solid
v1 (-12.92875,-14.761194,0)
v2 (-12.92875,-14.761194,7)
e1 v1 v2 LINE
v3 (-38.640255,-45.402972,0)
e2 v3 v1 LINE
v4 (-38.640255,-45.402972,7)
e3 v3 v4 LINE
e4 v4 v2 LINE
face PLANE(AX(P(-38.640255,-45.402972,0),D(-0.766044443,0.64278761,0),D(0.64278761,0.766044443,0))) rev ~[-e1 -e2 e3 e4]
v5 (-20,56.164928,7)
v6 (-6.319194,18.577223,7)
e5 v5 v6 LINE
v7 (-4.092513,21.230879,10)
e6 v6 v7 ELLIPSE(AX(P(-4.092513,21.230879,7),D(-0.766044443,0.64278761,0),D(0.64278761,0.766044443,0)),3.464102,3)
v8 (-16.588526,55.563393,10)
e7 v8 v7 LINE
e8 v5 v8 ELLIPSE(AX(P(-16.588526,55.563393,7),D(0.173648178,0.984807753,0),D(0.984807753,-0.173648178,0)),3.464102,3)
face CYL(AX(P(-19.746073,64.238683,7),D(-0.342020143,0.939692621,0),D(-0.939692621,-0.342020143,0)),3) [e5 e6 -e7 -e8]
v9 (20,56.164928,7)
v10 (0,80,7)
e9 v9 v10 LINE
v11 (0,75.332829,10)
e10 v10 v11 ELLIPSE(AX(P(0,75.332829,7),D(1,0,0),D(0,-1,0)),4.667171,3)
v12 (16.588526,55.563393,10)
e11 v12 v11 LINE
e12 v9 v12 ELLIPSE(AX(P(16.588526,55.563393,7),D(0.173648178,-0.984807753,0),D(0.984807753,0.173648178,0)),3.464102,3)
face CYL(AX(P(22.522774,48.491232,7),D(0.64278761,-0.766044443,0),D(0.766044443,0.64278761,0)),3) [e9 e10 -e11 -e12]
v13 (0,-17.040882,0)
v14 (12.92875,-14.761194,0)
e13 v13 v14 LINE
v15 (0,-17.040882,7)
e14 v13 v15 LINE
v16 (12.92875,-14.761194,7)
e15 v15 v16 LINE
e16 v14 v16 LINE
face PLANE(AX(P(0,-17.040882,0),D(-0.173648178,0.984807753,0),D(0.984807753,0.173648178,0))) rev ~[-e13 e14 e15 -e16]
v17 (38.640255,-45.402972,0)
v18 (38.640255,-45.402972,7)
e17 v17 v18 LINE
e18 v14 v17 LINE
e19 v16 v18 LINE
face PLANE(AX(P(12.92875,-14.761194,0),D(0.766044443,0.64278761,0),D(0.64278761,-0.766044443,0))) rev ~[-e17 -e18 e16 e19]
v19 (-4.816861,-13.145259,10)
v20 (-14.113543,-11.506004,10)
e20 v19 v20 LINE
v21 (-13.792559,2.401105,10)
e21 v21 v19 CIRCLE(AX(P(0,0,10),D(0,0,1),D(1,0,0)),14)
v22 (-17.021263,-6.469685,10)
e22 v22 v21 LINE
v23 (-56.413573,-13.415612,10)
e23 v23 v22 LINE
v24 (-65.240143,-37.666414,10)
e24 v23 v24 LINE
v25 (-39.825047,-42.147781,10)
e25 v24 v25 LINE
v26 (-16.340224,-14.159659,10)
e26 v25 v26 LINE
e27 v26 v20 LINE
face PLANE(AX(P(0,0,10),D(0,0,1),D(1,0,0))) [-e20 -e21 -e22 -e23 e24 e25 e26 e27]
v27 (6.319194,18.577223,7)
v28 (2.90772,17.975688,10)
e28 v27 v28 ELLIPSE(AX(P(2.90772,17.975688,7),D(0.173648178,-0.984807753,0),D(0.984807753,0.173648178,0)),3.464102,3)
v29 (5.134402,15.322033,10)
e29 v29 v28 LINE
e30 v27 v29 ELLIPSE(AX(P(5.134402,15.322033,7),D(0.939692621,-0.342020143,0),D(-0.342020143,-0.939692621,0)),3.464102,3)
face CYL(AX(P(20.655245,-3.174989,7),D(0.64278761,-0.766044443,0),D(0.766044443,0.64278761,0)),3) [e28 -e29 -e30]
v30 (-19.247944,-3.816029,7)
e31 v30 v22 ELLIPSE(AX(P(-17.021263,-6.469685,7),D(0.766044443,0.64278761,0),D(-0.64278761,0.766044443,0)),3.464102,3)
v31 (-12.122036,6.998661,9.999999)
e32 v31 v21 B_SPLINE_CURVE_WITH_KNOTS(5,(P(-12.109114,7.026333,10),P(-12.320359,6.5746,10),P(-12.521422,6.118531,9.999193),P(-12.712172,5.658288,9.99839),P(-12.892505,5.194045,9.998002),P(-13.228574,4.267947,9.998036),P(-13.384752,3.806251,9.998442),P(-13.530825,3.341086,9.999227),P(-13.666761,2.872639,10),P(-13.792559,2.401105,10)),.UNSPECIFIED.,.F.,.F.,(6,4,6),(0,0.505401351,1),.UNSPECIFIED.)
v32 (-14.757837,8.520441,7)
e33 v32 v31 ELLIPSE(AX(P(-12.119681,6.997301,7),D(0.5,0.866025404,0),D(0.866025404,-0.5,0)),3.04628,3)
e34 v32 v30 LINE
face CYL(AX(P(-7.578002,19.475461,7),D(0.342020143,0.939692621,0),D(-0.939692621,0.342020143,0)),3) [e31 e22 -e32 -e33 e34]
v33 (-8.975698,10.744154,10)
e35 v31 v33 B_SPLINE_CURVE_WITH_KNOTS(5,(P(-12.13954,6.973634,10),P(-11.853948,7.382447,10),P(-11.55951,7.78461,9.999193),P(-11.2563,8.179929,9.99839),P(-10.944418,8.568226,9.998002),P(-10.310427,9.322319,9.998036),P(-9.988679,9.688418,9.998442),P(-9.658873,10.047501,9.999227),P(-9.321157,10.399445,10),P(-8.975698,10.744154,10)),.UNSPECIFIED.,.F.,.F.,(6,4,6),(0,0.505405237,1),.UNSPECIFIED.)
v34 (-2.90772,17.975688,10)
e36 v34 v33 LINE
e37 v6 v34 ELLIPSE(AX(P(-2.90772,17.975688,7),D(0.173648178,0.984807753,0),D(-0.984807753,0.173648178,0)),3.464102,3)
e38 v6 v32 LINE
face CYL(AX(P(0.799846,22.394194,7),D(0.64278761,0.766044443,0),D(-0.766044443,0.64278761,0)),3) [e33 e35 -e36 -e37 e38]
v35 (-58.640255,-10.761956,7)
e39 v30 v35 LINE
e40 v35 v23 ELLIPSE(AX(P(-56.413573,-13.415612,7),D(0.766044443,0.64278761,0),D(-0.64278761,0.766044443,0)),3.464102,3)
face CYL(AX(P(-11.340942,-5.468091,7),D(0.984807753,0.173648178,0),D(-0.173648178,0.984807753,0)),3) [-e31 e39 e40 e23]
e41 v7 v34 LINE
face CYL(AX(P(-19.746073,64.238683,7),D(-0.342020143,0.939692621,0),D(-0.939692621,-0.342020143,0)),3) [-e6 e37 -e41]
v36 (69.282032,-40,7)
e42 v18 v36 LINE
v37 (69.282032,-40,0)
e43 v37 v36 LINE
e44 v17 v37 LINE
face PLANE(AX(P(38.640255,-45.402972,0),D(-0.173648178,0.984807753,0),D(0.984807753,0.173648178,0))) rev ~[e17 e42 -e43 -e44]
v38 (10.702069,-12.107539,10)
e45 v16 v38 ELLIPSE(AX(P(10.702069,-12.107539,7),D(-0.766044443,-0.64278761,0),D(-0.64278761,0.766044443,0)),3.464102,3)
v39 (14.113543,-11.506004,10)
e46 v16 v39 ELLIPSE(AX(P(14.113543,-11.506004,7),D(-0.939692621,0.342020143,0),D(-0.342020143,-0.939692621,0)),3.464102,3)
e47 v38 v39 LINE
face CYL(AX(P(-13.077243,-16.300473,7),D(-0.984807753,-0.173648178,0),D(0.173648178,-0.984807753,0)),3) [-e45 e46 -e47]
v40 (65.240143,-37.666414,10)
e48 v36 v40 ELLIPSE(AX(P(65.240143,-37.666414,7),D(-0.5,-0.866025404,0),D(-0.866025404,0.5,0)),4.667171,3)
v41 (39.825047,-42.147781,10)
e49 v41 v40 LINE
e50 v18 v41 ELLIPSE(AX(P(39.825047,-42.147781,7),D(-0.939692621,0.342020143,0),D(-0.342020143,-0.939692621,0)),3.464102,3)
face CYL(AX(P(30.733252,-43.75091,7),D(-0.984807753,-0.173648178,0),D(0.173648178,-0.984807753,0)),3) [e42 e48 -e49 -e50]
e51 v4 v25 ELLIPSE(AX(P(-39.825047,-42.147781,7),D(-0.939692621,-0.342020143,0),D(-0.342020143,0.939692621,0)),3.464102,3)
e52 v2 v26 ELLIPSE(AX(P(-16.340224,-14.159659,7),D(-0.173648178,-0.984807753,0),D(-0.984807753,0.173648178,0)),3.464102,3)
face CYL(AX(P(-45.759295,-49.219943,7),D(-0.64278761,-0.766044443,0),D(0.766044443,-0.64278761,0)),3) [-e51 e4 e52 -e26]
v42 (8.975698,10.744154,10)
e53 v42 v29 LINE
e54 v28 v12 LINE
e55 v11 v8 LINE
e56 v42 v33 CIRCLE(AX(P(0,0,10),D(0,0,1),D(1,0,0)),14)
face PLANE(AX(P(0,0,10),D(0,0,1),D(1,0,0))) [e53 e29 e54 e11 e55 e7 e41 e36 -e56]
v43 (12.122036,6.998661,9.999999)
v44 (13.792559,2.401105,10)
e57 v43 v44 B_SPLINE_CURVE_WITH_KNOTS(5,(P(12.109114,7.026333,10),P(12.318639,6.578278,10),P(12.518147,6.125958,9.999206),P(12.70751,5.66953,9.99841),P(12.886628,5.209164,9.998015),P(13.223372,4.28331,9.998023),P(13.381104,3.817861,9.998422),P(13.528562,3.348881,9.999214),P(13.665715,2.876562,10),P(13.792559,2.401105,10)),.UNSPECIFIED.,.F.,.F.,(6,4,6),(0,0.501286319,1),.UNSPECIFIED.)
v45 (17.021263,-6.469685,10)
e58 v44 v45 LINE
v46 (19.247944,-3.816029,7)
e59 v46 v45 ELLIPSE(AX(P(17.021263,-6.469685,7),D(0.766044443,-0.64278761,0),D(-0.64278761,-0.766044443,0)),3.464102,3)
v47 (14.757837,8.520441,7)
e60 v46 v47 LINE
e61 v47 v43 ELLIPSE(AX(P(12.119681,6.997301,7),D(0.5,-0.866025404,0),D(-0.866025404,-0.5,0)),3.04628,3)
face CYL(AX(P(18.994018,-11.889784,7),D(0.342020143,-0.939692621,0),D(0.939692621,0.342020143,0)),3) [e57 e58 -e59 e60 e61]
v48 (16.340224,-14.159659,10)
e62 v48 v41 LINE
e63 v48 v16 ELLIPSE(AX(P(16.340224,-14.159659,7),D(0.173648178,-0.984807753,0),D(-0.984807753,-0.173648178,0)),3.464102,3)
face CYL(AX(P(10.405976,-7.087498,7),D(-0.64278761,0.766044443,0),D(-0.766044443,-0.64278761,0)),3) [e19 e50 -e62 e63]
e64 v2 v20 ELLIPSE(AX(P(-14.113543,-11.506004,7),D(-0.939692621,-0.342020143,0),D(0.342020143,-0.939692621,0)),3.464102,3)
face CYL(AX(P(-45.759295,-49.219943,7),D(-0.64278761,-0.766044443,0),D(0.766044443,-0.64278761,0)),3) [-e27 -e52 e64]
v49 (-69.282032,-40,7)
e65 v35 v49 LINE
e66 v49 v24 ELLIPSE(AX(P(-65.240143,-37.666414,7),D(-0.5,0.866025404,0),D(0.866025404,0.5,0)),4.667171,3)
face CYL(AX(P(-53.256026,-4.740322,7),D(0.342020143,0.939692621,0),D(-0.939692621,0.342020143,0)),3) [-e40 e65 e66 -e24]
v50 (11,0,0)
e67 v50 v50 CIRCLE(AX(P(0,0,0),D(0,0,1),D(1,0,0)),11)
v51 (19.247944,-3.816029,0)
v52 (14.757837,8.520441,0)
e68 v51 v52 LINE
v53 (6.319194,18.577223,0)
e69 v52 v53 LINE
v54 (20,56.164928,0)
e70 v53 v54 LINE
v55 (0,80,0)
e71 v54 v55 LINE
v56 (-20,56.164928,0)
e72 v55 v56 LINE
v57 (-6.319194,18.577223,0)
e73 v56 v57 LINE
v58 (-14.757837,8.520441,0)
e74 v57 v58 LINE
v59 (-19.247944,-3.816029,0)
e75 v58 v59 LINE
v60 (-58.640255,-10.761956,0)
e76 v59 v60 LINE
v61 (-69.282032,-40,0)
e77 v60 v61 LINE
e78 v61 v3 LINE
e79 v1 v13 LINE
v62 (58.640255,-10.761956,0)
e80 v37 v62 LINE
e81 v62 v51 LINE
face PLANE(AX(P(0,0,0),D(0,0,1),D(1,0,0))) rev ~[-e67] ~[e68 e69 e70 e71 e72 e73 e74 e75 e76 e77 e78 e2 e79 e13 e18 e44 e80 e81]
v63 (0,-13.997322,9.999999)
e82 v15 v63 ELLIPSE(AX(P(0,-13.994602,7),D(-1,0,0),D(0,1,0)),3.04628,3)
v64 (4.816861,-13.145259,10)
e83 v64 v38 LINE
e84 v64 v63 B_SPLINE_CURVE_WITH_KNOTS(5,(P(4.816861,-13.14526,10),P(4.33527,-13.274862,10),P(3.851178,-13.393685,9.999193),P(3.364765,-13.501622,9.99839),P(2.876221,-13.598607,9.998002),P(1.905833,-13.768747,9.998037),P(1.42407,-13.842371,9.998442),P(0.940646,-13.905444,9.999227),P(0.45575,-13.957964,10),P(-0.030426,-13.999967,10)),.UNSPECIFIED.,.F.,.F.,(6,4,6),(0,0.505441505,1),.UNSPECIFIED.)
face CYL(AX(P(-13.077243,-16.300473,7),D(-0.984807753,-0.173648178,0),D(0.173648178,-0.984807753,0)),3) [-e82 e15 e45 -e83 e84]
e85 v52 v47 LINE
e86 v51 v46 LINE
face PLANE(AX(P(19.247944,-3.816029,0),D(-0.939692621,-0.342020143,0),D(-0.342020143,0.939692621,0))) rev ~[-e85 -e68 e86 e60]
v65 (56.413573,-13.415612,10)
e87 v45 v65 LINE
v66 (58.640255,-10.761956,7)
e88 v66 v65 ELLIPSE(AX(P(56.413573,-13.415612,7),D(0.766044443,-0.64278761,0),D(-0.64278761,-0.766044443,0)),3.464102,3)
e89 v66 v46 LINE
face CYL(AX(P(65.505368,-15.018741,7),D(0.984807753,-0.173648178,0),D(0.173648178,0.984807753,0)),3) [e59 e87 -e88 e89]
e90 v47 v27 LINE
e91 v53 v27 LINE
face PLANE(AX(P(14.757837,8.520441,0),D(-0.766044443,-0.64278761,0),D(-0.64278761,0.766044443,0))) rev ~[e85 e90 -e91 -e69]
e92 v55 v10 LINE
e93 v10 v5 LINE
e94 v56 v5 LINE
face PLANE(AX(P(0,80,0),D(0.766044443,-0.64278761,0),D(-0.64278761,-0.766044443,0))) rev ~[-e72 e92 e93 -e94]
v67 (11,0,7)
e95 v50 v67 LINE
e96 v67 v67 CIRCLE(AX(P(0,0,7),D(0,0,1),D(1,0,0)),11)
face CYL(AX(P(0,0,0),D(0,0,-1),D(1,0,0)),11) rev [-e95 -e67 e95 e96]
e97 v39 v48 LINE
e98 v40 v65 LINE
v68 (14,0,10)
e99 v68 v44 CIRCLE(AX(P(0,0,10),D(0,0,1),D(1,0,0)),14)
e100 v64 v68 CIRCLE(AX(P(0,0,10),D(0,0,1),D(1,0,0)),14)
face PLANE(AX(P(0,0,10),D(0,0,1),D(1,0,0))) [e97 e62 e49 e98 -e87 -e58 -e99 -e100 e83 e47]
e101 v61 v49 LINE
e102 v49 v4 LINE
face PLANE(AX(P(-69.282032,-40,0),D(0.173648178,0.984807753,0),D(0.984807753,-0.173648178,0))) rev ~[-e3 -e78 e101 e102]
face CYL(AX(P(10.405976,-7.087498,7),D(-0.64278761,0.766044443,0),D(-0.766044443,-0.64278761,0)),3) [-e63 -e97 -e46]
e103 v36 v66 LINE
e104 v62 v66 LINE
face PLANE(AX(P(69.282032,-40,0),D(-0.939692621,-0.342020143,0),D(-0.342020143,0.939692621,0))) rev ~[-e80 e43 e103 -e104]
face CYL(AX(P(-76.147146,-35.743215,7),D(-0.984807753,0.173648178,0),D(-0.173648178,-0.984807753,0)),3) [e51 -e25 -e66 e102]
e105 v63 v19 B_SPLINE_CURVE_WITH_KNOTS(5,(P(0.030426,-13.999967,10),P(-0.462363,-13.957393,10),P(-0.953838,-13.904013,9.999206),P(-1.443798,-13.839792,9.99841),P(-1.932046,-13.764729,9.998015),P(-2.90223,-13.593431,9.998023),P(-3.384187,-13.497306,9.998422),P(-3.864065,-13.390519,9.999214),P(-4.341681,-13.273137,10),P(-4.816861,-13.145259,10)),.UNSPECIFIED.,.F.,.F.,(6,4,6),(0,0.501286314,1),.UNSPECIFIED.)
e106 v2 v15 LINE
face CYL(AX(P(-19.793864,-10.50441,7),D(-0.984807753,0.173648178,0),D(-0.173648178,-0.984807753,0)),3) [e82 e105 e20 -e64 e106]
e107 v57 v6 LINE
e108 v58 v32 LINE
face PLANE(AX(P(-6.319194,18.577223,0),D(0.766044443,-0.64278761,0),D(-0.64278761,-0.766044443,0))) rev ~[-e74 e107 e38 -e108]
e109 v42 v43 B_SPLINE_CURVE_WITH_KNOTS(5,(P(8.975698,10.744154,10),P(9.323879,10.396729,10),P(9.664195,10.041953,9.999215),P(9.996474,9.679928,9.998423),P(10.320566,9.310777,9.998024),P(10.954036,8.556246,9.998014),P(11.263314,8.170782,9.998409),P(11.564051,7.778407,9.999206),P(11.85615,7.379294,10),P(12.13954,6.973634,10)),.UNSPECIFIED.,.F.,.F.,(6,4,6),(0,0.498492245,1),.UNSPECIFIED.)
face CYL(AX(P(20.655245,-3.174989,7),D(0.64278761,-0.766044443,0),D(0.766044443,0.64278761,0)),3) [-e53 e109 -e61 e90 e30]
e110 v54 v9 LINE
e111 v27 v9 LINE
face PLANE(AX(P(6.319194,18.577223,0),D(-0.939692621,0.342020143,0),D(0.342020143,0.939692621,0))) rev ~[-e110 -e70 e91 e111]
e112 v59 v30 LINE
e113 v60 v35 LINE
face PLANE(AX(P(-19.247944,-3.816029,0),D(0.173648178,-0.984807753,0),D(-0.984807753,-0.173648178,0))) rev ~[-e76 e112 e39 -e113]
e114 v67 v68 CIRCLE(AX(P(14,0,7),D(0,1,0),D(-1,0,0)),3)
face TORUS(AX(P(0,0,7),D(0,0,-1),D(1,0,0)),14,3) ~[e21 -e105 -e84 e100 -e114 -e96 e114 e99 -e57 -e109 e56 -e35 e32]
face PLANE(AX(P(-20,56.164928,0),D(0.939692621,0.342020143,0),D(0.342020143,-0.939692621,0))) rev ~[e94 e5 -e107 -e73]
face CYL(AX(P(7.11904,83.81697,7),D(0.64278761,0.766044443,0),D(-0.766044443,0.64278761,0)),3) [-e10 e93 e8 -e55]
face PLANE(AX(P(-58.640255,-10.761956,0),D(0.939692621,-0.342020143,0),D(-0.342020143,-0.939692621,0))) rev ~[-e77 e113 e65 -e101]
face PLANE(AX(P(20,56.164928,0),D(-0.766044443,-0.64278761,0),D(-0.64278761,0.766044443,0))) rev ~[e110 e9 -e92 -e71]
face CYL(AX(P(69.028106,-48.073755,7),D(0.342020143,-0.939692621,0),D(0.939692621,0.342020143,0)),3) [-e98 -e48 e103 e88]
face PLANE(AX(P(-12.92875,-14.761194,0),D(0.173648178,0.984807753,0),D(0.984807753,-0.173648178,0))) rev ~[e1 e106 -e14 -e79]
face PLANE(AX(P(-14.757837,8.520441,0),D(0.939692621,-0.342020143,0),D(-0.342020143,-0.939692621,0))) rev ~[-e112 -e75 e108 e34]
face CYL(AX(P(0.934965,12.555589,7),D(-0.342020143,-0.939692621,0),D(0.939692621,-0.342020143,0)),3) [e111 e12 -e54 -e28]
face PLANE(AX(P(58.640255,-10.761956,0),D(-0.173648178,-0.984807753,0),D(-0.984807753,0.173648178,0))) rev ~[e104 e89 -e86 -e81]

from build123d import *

# Parameters (mm, degrees)
F0_R          = 11
F1_DEPTH      = 10
F2_T1_DEPTH   = 46.1144765372
F2_T3_DEPTH   = 46.1144765372
F2_T5_DEPTH   = 46.1144765372
F2_T7_DEPTH   = 46.1144765372
F2_T9_DEPTH   = 46.1144765372
F2_T11_DEPTH  = 46.1144765372
F2_T16_DEPTH  = 33.3781970019
F2_T21_DEPTH  = 33.3781970019
F2_T26_DEPTH  = 55
F2_T31_DEPTH  = 55
F2_T36_DEPTH  = 33.3781970019
F2_T41_DEPTH  = 33.3781970019
F2_T46_DEPTH  = 55
F2_T51_DEPTH  = 55
F2_T56_DEPTH  = 33.3781970019
F2_T61_DEPTH  = 33.3781970019
F2_T66_DEPTH  = 55
F2_T71_DEPTH  = 55
F2_T79_DEPTH  = 33.3781970019
F2_T83_DEPTH  = 55
F2_T90_DEPTH  = 33.3781970019
F2_T94_DEPTH  = 55
F2_T101_DEPTH = 55
F2_T105_DEPTH = 33.3781970019
F2_T112_DEPTH = 33.3781970019
F2_T116_DEPTH = 55
F2_T123_DEPTH = 55
F2_T127_DEPTH = 33.3781970019
F2_T134_DEPTH = 33.3781970019
F2_T138_DEPTH = 55


# Not quite as in the source:
# - a fillet or chamfer that OpenCascade refuses, or shapes differently, is made with other operations: its cross-section is extruded or revolved along the edge and cut away or added


with BuildPart() as f1:
    # F0 (on Top) → F1 (new body)
    with BuildSketch(Plane.XY):
        Polygon((20, 56.1649281481), (0, 80), (-20, 56.1649281481), (-6.319194267, 18.5772233167), (-14.7578366373, 8.5204409552), (-19.2479444575, -3.8160288917), (-58.640254578, -10.7619559984), (-69.2820323028, -40), (-38.640254578, -45.4029721497), (-12.9287501905, -14.761194425), (0, -17.0408819104), (12.9287501905, -14.761194425), (38.640254578, -45.4029721497), (69.2820323028, -40), (58.640254578, -10.7619559984), (19.2479444575, -3.8160288917), (14.7578366373, 8.5204409552), (6.319194267, 18.5772233167), align=None)
        Circle(F0_R, mode=Mode.SUBTRACT)
    extrude(amount=F1_DEPTH)

    # F2: fillet of radius 3 on 19 edges, made by hand

    # F2_s2 → F2_t1 (cut)
    with BuildSketch(Plane(origin=(-14.5714030478, 17.3655219314, 0), x_dir=(0, 0, 1), z_dir=(-0.6427876097, 0.7660444431, 0))):
        with BuildLine():
            ThreePointArc((7, 51.4230087749), (9.1213203436, 50.5443291185), (10, 48.4230087749))
            Line((10, 48.4230087749), (10, 51.4230087749))
            Line((10, 51.4230087749), (7, 51.4230087749))
        make_face()
    extrude(amount=F2_T1_DEPTH, mode=Mode.SUBTRACT)

    # F2_s4 → F2_t3 (cut)
    with BuildSketch(Plane(origin=(44.2132171931, 52.6912604301, 0), x_dir=(0, 0, 1), z_dir=(-0.6427876097, -0.7660444431, 0))):
        with BuildLine():
            ThreePointArc((7, 51.4230087749), (9.1213203436, 50.5443291185), (10, 48.4230087749))
            Line((10, 48.4230087749), (10, 51.4230087749))
            Line((10, 51.4230087749), (7, 51.4230087749))
        make_face()
    extrude(amount=F2_T3_DEPTH, mode=Mode.SUBTRACT)

    # F2_s6 → F2_t5 (cut)
    with BuildSketch(Plane(origin=(-7.7532816186, -21.3019661739, 0), x_dir=(0, 0, 1), z_dir=(-0.3420201433, -0.9396926208, 0))):
        with BuildLine():
            ThreePointArc((7, 51.4230087749), (9.1213203436, 50.5443291185), (10, 48.4230087749))
            Line((10, 48.4230087749), (10, 51.4230087749))
            Line((10, 51.4230087749), (7, 51.4230087749))
        make_face()
    extrude(amount=F2_T5_DEPTH, mode=Mode.SUBTRACT)

    # F2_s8 → F2_t7 (cut)
    with BuildSketch(Plane(origin=(-67.7385786864, 11.9441390573, 0), x_dir=(0, 0, 1), z_dir=(0.984807753, -0.1736481777, 0))):
        with BuildLine():
            ThreePointArc((7, 51.4230087749), (9.1213203436, 50.5443291185), (10, 48.4230087749))
            Line((10, 48.4230087749), (10, 51.4230087749))
            Line((10, 51.4230087749), (7, 51.4230087749))
        make_face()
    extrude(amount=F2_T7_DEPTH, mode=Mode.SUBTRACT)

    # F2_s10 → F2_t9 (cut)
    with BuildSketch(Plane(origin=(22.3246846665, 3.9364442425, 0), x_dir=(0, 0, 1), z_dir=(0.984807753, 0.1736481777, 0))):
        with BuildLine():
            ThreePointArc((7, 51.4230087749), (9.1213203436, 50.5443291185), (10, 48.4230087749))
            Line((10, 48.4230087749), (10, 51.4230087749))
            Line((10, 51.4230087749), (7, 51.4230087749))
        make_face()
    extrude(amount=F2_T9_DEPTH, mode=Mode.SUBTRACT)

    # F2_s12 → F2_t11 (cut)
    with BuildSketch(Plane(origin=(23.5253614933, -64.6353994873, 0), x_dir=(0, 0, 1), z_dir=(-0.3420201433, 0.9396926208, 0))):
        with BuildLine():
            ThreePointArc((7, 51.4230087749), (9.1213203436, 50.5443291185), (10, 48.4230087749))
            Line((10, 48.4230087749), (10, 51.4230087749))
            Line((10, 51.4230087749), (7, 51.4230087749))
        make_face()
    extrude(amount=F2_T11_DEPTH, mode=Mode.SUBTRACT)


with BuildPart() as f2_tool14:
    # F2_s15 → F2_t16 (new body)
    with BuildSketch(Plane(origin=(6.043180902, -16.60350307, 0), x_dir=(0, 0, 1), z_dir=(-0.3420201433, 0.9396926208, 0))):
        with BuildLine():
            ThreePointArc((7, 16.7819926235), (9.1213203436, 15.9033129671), (10, 13.7819926235))
            Line((10, 13.7819926235), (10, 16.7819926235))
            Line((10, 16.7819926235), (7, 16.7819926235))
        make_face()
    extrude(amount=F2_T16_DEPTH)

    split(bisect_by=Plane(origin=(-0.0721828315, -0.4093691799, 0), x_dir=(0, 0, 1), z_dir=(0.1736481777, 0.984807753, 0)), keep=Keep.TOP)


with BuildPart() as f1_1:
    add(f1.part)

    # F2_t13: cut F2_tool14
    add(f2_tool14.part, mode=Mode.SUBTRACT)


with BuildPart() as f2_tool19:
    # F2_s20 → F2_t21 (new body)
    with BuildSketch(Plane(origin=(10.0976264671, -12.0338826188, 0), x_dir=(0, 0, 1), z_dir=(-0.6427876097, 0.7660444431, 0))):
        with BuildLine():
            ThreePointArc((7, 16.7819926235), (9.1213203436, 15.9033129671), (10, 13.7819926235))
            Line((10, 13.7819926235), (10, 16.7819926235))
            Line((10, 16.7819926235), (7, 16.7819926235))
        make_face()
    extrude(amount=F2_T21_DEPTH)

    split(bisect_by=Plane(origin=(-0.3906155251, 0.1421724242, 0), x_dir=(0, 0, 1), z_dir=(0.9396926208, -0.3420201433, 0)), keep=Keep.TOP)


with BuildPart() as f1_2:
    add(f1_1.part)

    # F2_t18: cut F2_tool19
    add(f2_tool19.part, mode=Mode.SUBTRACT)


with BuildPart() as f2_tool24:
    # F2_s25 → F2_t26 (new body)
    with BuildSketch(Plane(origin=(4.1446587171, 11.3873562366, 0), x_dir=(0, 0, 1), z_dir=(0.3420201433, 0.9396926208, 0))):
        with BuildLine():
            ThreePointArc((7, -0.4156843594), (9.1213203436, -1.2943640158), (10, -3.4156843594))
            Line((10, -3.4156843594), (10, -0.4156843594))
            Line((10, -0.4156843594), (7, -0.4156843594))
        make_face()
    extrude(amount=F2_T26_DEPTH)

    split(bisect_by=Plane(origin=(12.8557521937, 10.7872569243, 0), x_dir=(0, 0, 1), z_dir=(0.7660444431, 0.6427876097, 0)), keep=Keep.TOP)


with BuildPart() as f1_3:
    add(f1_2.part)

    # F2_t23: cut F2_tool24
    add(f2_tool24.part, mode=Mode.SUBTRACT)


with BuildPart() as f2_tool29:
    # F2_s30 → F2_t31 (new body)
    with BuildSketch(Plane(origin=(-22.9557666, 63.0704503798, 0), x_dir=(0, 0, 1), z_dir=(0.3420201433, -0.9396926208, 0))):
        with BuildLine():
            ThreePointArc((7, -0.4156843594), (9.1213203436, -1.2943640158), (10, -3.4156843594))
            Line((10, -3.4156843594), (10, -0.4156843594))
            Line((10, -0.4156843594), (7, -0.4156843594))
        make_face()
    extrude(amount=F2_T31_DEPTH)

    split(bisect_by=Plane(origin=(-12.8557521937, 10.7872569243, 0), x_dir=(0, 0, 1), z_dir=(-0.7660444431, 0.6427876097, 0)), keep=Keep.TOP)


with BuildPart() as f1_4:
    add(f1_3.part)

    # F2_t28: cut F2_tool29
    add(f2_tool29.part, mode=Mode.SUBTRACT)


with BuildPart() as f2_tool34:
    # F2_s35 → F2_t36 (new body)
    with BuildSketch(Plane(origin=(11.3574649994, 13.5352997158, 0), x_dir=(0, 0, 1), z_dir=(-0.6427876097, -0.7660444431, 0))):
        with BuildLine():
            ThreePointArc((7, 16.7819926235), (9.1213203436, 15.9033129671), (10, 13.7819926235))
            Line((10, 13.7819926235), (10, 16.7819926235))
            Line((10, 16.7819926235), (7, 16.7819926235))
        make_face()
    extrude(amount=F2_T36_DEPTH)

    split(bisect_by=Plane(origin=(0.3906155251, 0.1421724242, 0), x_dir=(0, 0, 1), z_dir=(-0.9396926208, -0.3420201433, 0)), keep=Keep.TOP)


with BuildPart() as f1_5:
    add(f1_4.part)

    # F2_t33: cut F2_tool34
    add(f2_tool34.part, mode=Mode.SUBTRACT)


with BuildPart() as f2_tool39:
    # F2_s40 → F2_t41 (new body)
    with BuildSketch(Plane(origin=(5.3728348205, 14.7617423478, 0), x_dir=(0, 0, 1), z_dir=(-0.3420201433, -0.9396926208, 0))):
        with BuildLine():
            ThreePointArc((7, 16.7819926235), (9.1213203436, 15.9033129671), (10, 13.7819926235))
            Line((10, 13.7819926235), (10, 16.7819926235))
            Line((10, 16.7819926235), (7, 16.7819926235))
        make_face()
    extrude(amount=F2_T41_DEPTH)

    split(bisect_by=Plane(origin=(0.0721828315, -0.4093691799, 0), x_dir=(0, 0, 1), z_dir=(-0.1736481777, 0.984807753, 0)), keep=Keep.TOP)


with BuildPart() as f1_6:
    add(f1_5.part)

    # F2_t38: cut F2_tool39
    add(f2_tool39.part, mode=Mode.SUBTRACT)


with BuildPart() as f2_tool44:
    # F2_s45 → F2_t46 (new body)
    with BuildSketch(Plane(origin=(-11.9340691414, -2.1042983793, 0), x_dir=(0, 0, 1), z_dir=(-0.984807753, -0.1736481777, 0))):
        with BuildLine():
            ThreePointArc((7, -0.4156843594), (9.1213203436, -1.2943640158), (10, -3.4156843594))
            Line((10, -3.4156843594), (10, -0.4156843594))
            Line((10, -0.4156843594), (7, -0.4156843594))
        make_face()
    extrude(amount=F2_T46_DEPTH)

    split(bisect_by=Plane(origin=(-15.7699146304, 5.7397795224, 0), x_dir=(0, 0, 1), z_dir=(-0.9396926208, 0.3420201433, 0)), keep=Keep.TOP)


with BuildPart() as f1_7:
    add(f1_6.part)

    # F2_t43: cut F2_tool44
    add(f2_tool44.part, mode=Mode.SUBTRACT)


with BuildPart() as f2_tool49:
    # F2_s50 → F2_t51 (new body)
    with BuildSketch(Plane(origin=(-43.1427289571, -51.4155022289, 0), x_dir=(0, 0, 1), z_dir=(0.6427876097, 0.7660444431, 0))):
        with BuildLine():
            ThreePointArc((7, -0.4156843594), (9.1213203436, -1.2943640158), (10, -3.4156843594))
            Line((10, -3.4156843594), (10, -0.4156843594))
            Line((10, -0.4156843594), (7, -0.4156843594))
        make_face()
    extrude(amount=F2_T51_DEPTH)

    split(bisect_by=Plane(origin=(-2.9141624367, -16.5270364467, 0), x_dir=(0, 0, 1), z_dir=(-0.1736481777, -0.984807753, 0)), keep=Keep.TOP)


with BuildPart() as f1_8:
    add(f1_7.part)

    # F2_t48: cut F2_tool49
    add(f2_tool49.part, mode=Mode.SUBTRACT)


with BuildPart() as f2_tool54:
    # F2_s55 → F2_t56 (new body)
    with BuildSketch(Plane(origin=(-17.4006459014, 3.0682033542, 0), x_dir=(0, 0, 1), z_dir=(0.984807753, -0.1736481777, 0))):
        with BuildLine():
            ThreePointArc((7, 16.7819926235), (9.1213203436, 15.9033129671), (10, 13.7819926235))
            Line((10, 13.7819926235), (10, 16.7819926235))
            Line((10, 16.7819926235), (7, 16.7819926235))
        make_face()
    extrude(amount=F2_T56_DEPTH)

    split(bisect_by=Plane(origin=(-0.3184326936, 0.2671967557, 0), x_dir=(0, 0, 1), z_dir=(0.7660444431, -0.6427876097, 0)), keep=Keep.TOP)


with BuildPart() as f1_9:
    add(f1_8.part)

    # F2_t53: cut F2_tool54
    add(f2_tool54.part, mode=Mode.SUBTRACT)


with BuildPart() as f2_tool59:
    # F2_s60 → F2_t61 (new body)
    with BuildSketch(Plane(origin=(-15.4704612876, -2.727859729, 0), x_dir=(0, 0, 1), z_dir=(0.984807753, 0.1736481777, 0))):
        with BuildLine():
            ThreePointArc((7, 16.7819926235), (9.1213203436, 15.9033129671), (10, 13.7819926235))
            Line((10, 13.7819926235), (10, 16.7819926235))
            Line((10, 16.7819926235), (7, 16.7819926235))
        make_face()
    extrude(amount=F2_T61_DEPTH)

    split(bisect_by=Plane(origin=(0.3184326936, 0.2671967557, 0), x_dir=(0, 0, 1), z_dir=(-0.7660444431, -0.6427876097, 0)), keep=Keep.TOP)


with BuildPart() as f1_10:
    add(f1_9.part)

    # F2_t58: cut F2_tool59
    add(f2_tool59.part, mode=Mode.SUBTRACT)


with BuildPart() as f2_tool64:
    # F2_s65 → F2_t66 (new body)
    with BuildSketch(Plane(origin=(7.7894104243, -9.2830578573, 0), x_dir=(0, 0, 1), z_dir=(0.6427876097, -0.7660444431, 0))):
        with BuildLine():
            ThreePointArc((7, -0.4156843594), (9.1213203436, -1.2943640158), (10, -3.4156843594))
            Line((10, -3.4156843594), (10, -0.4156843594))
            Line((10, -0.4156843594), (7, -0.4156843594))
        make_face()
    extrude(amount=F2_T66_DEPTH)

    split(bisect_by=Plane(origin=(2.9141624367, -16.5270364467, 0), x_dir=(0, 0, 1), z_dir=(0.1736481777, -0.984807753, 0)), keep=Keep.TOP)


with BuildPart() as f1_11:
    add(f1_10.part)

    # F2_t63: cut F2_tool64
    add(f2_tool64.part, mode=Mode.SUBTRACT)


with BuildPart() as f2_tool69:
    # F2_s70 → F2_t71 (new body)
    with BuildSketch(Plane(origin=(66.0984955571, -11.654948151, 0), x_dir=(0, 0, 1), z_dir=(-0.984807753, 0.1736481777, 0))):
        with BuildLine():
            ThreePointArc((7, -0.4156843594), (9.1213203436, -1.2943640158), (10, -3.4156843594))
            Line((10, -3.4156843594), (10, -0.4156843594))
            Line((10, -0.4156843594), (7, -0.4156843594))
        make_face()
    extrude(amount=F2_T71_DEPTH)

    split(bisect_by=Plane(origin=(15.7699146304, 5.7397795224, 0), x_dir=(0, 0, 1), z_dir=(0.9396926208, 0.3420201433, 0)), keep=Keep.TOP)


with BuildPart() as f1_12:
    add(f1_11.part)

    # F2_t68: cut F2_tool69
    add(f2_tool69.part, mode=Mode.SUBTRACT)

    # F2_s73 → F2_t74 (revolve, cut)
    with BuildSketch(Plane.XZ):
        with BuildLine():
            ThreePointArc((11, 7), (11.8786796564, 9.1213203436), (14, 10))
            Line((14, 10), (11, 10))
            Line((11, 10), (11, 7))
        make_face()
    revolve(axis=Axis((0, 0, 10), (0, 0, 1)), mode=Mode.SUBTRACT)


with BuildPart() as f2_tool77:
    # F2_s78 → F2_t79 (new body)
    with BuildSketch(Plane(origin=(6.043180902, -16.60350307, 0), x_dir=(0, 0, 1), z_dir=(-0.3420201433, 0.9396926208, 0))):
        with BuildLine():
            ThreePointArc((7, 16.7819926235), (9.1213203436, 15.9033129671), (10, 13.7819926235))
            Line((10, 13.7819926235), (10, 16.7819926235))
            Line((10, 16.7819926235), (7, 16.7819926235))
        make_face()
    extrude(amount=F2_T79_DEPTH)

    split(bisect_by=Plane(origin=(-0.0721828315, -0.4093691799, 0), x_dir=(0, 0, 1), z_dir=(-0.1736481777, -0.984807753, 0)), keep=Keep.TOP)


with BuildPart() as f2_tool81:
    # F2_s82 → F2_t83 (new body)
    with BuildSketch(Plane(origin=(66.0984955571, -11.654948151, 0), x_dir=(0, 0, 1), z_dir=(-0.984807753, 0.1736481777, 0))):
        with BuildLine():
            ThreePointArc((7, -0.4156843594), (9.1213203436, -1.2943640158), (10, -3.4156843594))
            Line((10, -3.4156843594), (10, -0.4156843594))
            Line((10, -0.4156843594), (7, -0.4156843594))
        make_face()
    extrude(amount=F2_T83_DEPTH)

    split(bisect_by=Plane(origin=(15.7699146304, 5.7397795224, 0), x_dir=(0, 0, 1), z_dir=(-0.9396926208, -0.3420201433, 0)), keep=Keep.TOP)


with BuildPart() as f2_tool77_1:
    add(f2_tool77.part)

    # F2_t85: intersect F2_tool81
    add(f2_tool81.part, mode=Mode.INTERSECT)


with BuildPart() as f1_13:
    add(f1_12.part)

    # F2_t75: cut F2_tool77
    add(f2_tool77_1.part, mode=Mode.SUBTRACT)


with BuildPart() as f2_tool88:
    # F2_s89 → F2_t90 (new body)
    with BuildSketch(Plane(origin=(10.0976264671, -12.0338826188, 0), x_dir=(0, 0, 1), z_dir=(-0.6427876097, 0.7660444431, 0))):
        with BuildLine():
            ThreePointArc((7, 16.7819926235), (9.1213203436, 15.9033129671), (10, 13.7819926235))
            Line((10, 13.7819926235), (10, 16.7819926235))
            Line((10, 16.7819926235), (7, 16.7819926235))
        make_face()
    extrude(amount=F2_T90_DEPTH)

    split(bisect_by=Plane(origin=(-0.3906155251, 0.1421724242, 0), x_dir=(0, 0, 1), z_dir=(-0.9396926208, 0.3420201433, 0)), keep=Keep.TOP)


with BuildPart() as f2_tool92:
    # F2_s93 → F2_t94 (new body)
    with BuildSketch(Plane(origin=(4.1446587171, 11.3873562366, 0), x_dir=(0, 0, 1), z_dir=(0.3420201433, 0.9396926208, 0))):
        with BuildLine():
            ThreePointArc((7, -0.4156843594), (9.1213203436, -1.2943640158), (10, -3.4156843594))
            Line((10, -3.4156843594), (10, -0.4156843594))
            Line((10, -0.4156843594), (7, -0.4156843594))
        make_face()
    extrude(amount=F2_T94_DEPTH)

    split(bisect_by=Plane(origin=(12.8557521937, 10.7872569243, 0), x_dir=(0, 0, 1), z_dir=(-0.7660444431, -0.6427876097, 0)), keep=Keep.TOP)


with BuildPart() as f2_tool88_1:
    add(f2_tool88.part)

    # F2_t96: intersect F2_tool92
    add(f2_tool92.part, mode=Mode.INTERSECT)


with BuildPart() as f1_14:
    add(f1_13.part)

    # F2_t86: cut F2_tool88
    add(f2_tool88_1.part, mode=Mode.SUBTRACT)


with BuildPart() as f2_tool99:
    # F2_s100 → F2_t101 (new body)
    with BuildSketch(Plane(origin=(-22.9557666, 63.0704503798, 0), x_dir=(0, 0, 1), z_dir=(0.3420201433, -0.9396926208, 0))):
        with BuildLine():
            ThreePointArc((7, -0.4156843594), (9.1213203436, -1.2943640158), (10, -3.4156843594))
            Line((10, -3.4156843594), (10, -0.4156843594))
            Line((10, -0.4156843594), (7, -0.4156843594))
        make_face()
    extrude(amount=F2_T101_DEPTH)

    split(bisect_by=Plane(origin=(-12.8557521937, 10.7872569243, 0), x_dir=(0, 0, 1), z_dir=(0.7660444431, -0.6427876097, 0)), keep=Keep.TOP)


with BuildPart() as f2_tool103:
    # F2_s104 → F2_t105 (new body)
    with BuildSketch(Plane(origin=(11.3574649994, 13.5352997158, 0), x_dir=(0, 0, 1), z_dir=(-0.6427876097, -0.7660444431, 0))):
        with BuildLine():
            ThreePointArc((7, 16.7819926235), (9.1213203436, 15.9033129671), (10, 13.7819926235))
            Line((10, 13.7819926235), (10, 16.7819926235))
            Line((10, 16.7819926235), (7, 16.7819926235))
        make_face()
    extrude(amount=F2_T105_DEPTH)

    split(bisect_by=Plane(origin=(0.3906155251, 0.1421724242, 0), x_dir=(0, 0, 1), z_dir=(0.9396926208, 0.3420201433, 0)), keep=Keep.TOP)


with BuildPart() as f2_tool99_1:
    add(f2_tool99.part)

    # F2_t107: intersect F2_tool103
    add(f2_tool103.part, mode=Mode.INTERSECT)


with BuildPart() as f1_15:
    add(f1_14.part)

    # F2_t97: cut F2_tool99
    add(f2_tool99_1.part, mode=Mode.SUBTRACT)


with BuildPart() as f2_tool110:
    # F2_s111 → F2_t112 (new body)
    with BuildSketch(Plane(origin=(5.3728348205, 14.7617423478, 0), x_dir=(0, 0, 1), z_dir=(-0.3420201433, -0.9396926208, 0))):
        with BuildLine():
            ThreePointArc((7, 16.7819926235), (9.1213203436, 15.9033129671), (10, 13.7819926235))
            Line((10, 13.7819926235), (10, 16.7819926235))
            Line((10, 16.7819926235), (7, 16.7819926235))
        make_face()
    extrude(amount=F2_T112_DEPTH)

    split(bisect_by=Plane(origin=(0.0721828315, -0.4093691799, 0), x_dir=(0, 0, 1), z_dir=(0.1736481777, -0.984807753, 0)), keep=Keep.TOP)


with BuildPart() as f2_tool114:
    # F2_s115 → F2_t116 (new body)
    with BuildSketch(Plane(origin=(-11.9340691414, -2.1042983793, 0), x_dir=(0, 0, 1), z_dir=(-0.984807753, -0.1736481777, 0))):
        with BuildLine():
            ThreePointArc((7, -0.4156843594), (9.1213203436, -1.2943640158), (10, -3.4156843594))
            Line((10, -3.4156843594), (10, -0.4156843594))
            Line((10, -0.4156843594), (7, -0.4156843594))
        make_face()
    extrude(amount=F2_T116_DEPTH)

    split(bisect_by=Plane(origin=(-15.7699146304, 5.7397795224, 0), x_dir=(0, 0, 1), z_dir=(0.9396926208, -0.3420201433, 0)), keep=Keep.TOP)


with BuildPart() as f2_tool110_1:
    add(f2_tool110.part)

    # F2_t118: intersect F2_tool114
    add(f2_tool114.part, mode=Mode.INTERSECT)


with BuildPart() as f1_16:
    add(f1_15.part)

    # F2_t108: cut F2_tool110
    add(f2_tool110_1.part, mode=Mode.SUBTRACT)


with BuildPart() as f2_tool121:
    # F2_s122 → F2_t123 (new body)
    with BuildSketch(Plane(origin=(-43.1427289571, -51.4155022289, 0), x_dir=(0, 0, 1), z_dir=(0.6427876097, 0.7660444431, 0))):
        with BuildLine():
            ThreePointArc((7, -0.4156843594), (9.1213203436, -1.2943640158), (10, -3.4156843594))
            Line((10, -3.4156843594), (10, -0.4156843594))
            Line((10, -0.4156843594), (7, -0.4156843594))
        make_face()
    extrude(amount=F2_T123_DEPTH)

    split(bisect_by=Plane(origin=(-2.9141624367, -16.5270364467, 0), x_dir=(0, 0, 1), z_dir=(0.1736481777, 0.984807753, 0)), keep=Keep.TOP)


with BuildPart() as f2_tool125:
    # F2_s126 → F2_t127 (new body)
    with BuildSketch(Plane(origin=(-17.4006459014, 3.0682033542, 0), x_dir=(0, 0, 1), z_dir=(0.984807753, -0.1736481777, 0))):
        with BuildLine():
            ThreePointArc((7, 16.7819926235), (9.1213203436, 15.9033129671), (10, 13.7819926235))
            Line((10, 13.7819926235), (10, 16.7819926235))
            Line((10, 16.7819926235), (7, 16.7819926235))
        make_face()
    extrude(amount=F2_T127_DEPTH)

    split(bisect_by=Plane(origin=(-0.3184326936, 0.2671967557, 0), x_dir=(0, 0, 1), z_dir=(-0.7660444431, 0.6427876097, 0)), keep=Keep.TOP)


with BuildPart() as f2_tool121_1:
    add(f2_tool121.part)

    # F2_t129: intersect F2_tool125
    add(f2_tool125.part, mode=Mode.INTERSECT)


with BuildPart() as f1_17:
    add(f1_16.part)

    # F2_t119: cut F2_tool121
    add(f2_tool121_1.part, mode=Mode.SUBTRACT)


with BuildPart() as f2_tool132:
    # F2_s133 → F2_t134 (new body)
    with BuildSketch(Plane(origin=(-15.4704612876, -2.727859729, 0), x_dir=(0, 0, 1), z_dir=(0.984807753, 0.1736481777, 0))):
        with BuildLine():
            ThreePointArc((7, 16.7819926235), (9.1213203436, 15.9033129671), (10, 13.7819926235))
            Line((10, 13.7819926235), (10, 16.7819926235))
            Line((10, 16.7819926235), (7, 16.7819926235))
        make_face()
    extrude(amount=F2_T134_DEPTH)

    split(bisect_by=Plane(origin=(0.3184326936, 0.2671967557, 0), x_dir=(0, 0, 1), z_dir=(0.7660444431, 0.6427876097, 0)), keep=Keep.TOP)


with BuildPart() as f2_tool136:
    # F2_s137 → F2_t138 (new body)
    with BuildSketch(Plane(origin=(7.7894104243, -9.2830578573, 0), x_dir=(0, 0, 1), z_dir=(0.6427876097, -0.7660444431, 0))):
        with BuildLine():
            ThreePointArc((7, -0.4156843594), (9.1213203436, -1.2943640158), (10, -3.4156843594))
            Line((10, -3.4156843594), (10, -0.4156843594))
            Line((10, -0.4156843594), (7, -0.4156843594))
        make_face()
    extrude(amount=F2_T138_DEPTH)

    split(bisect_by=Plane(origin=(2.9141624367, -16.5270364467, 0), x_dir=(0, 0, 1), z_dir=(-0.1736481777, 0.984807753, 0)), keep=Keep.TOP)


with BuildPart() as f2_tool132_1:
    add(f2_tool132.part)

    # F2_t140: intersect F2_tool136
    add(f2_tool136.part, mode=Mode.INTERSECT)


with BuildPart() as f1_18:
    add(f1_17.part)

    # F2_t130: cut F2_tool132
    add(f2_tool132_1.part, mode=Mode.SUBTRACT)


solid = f1_18.part
